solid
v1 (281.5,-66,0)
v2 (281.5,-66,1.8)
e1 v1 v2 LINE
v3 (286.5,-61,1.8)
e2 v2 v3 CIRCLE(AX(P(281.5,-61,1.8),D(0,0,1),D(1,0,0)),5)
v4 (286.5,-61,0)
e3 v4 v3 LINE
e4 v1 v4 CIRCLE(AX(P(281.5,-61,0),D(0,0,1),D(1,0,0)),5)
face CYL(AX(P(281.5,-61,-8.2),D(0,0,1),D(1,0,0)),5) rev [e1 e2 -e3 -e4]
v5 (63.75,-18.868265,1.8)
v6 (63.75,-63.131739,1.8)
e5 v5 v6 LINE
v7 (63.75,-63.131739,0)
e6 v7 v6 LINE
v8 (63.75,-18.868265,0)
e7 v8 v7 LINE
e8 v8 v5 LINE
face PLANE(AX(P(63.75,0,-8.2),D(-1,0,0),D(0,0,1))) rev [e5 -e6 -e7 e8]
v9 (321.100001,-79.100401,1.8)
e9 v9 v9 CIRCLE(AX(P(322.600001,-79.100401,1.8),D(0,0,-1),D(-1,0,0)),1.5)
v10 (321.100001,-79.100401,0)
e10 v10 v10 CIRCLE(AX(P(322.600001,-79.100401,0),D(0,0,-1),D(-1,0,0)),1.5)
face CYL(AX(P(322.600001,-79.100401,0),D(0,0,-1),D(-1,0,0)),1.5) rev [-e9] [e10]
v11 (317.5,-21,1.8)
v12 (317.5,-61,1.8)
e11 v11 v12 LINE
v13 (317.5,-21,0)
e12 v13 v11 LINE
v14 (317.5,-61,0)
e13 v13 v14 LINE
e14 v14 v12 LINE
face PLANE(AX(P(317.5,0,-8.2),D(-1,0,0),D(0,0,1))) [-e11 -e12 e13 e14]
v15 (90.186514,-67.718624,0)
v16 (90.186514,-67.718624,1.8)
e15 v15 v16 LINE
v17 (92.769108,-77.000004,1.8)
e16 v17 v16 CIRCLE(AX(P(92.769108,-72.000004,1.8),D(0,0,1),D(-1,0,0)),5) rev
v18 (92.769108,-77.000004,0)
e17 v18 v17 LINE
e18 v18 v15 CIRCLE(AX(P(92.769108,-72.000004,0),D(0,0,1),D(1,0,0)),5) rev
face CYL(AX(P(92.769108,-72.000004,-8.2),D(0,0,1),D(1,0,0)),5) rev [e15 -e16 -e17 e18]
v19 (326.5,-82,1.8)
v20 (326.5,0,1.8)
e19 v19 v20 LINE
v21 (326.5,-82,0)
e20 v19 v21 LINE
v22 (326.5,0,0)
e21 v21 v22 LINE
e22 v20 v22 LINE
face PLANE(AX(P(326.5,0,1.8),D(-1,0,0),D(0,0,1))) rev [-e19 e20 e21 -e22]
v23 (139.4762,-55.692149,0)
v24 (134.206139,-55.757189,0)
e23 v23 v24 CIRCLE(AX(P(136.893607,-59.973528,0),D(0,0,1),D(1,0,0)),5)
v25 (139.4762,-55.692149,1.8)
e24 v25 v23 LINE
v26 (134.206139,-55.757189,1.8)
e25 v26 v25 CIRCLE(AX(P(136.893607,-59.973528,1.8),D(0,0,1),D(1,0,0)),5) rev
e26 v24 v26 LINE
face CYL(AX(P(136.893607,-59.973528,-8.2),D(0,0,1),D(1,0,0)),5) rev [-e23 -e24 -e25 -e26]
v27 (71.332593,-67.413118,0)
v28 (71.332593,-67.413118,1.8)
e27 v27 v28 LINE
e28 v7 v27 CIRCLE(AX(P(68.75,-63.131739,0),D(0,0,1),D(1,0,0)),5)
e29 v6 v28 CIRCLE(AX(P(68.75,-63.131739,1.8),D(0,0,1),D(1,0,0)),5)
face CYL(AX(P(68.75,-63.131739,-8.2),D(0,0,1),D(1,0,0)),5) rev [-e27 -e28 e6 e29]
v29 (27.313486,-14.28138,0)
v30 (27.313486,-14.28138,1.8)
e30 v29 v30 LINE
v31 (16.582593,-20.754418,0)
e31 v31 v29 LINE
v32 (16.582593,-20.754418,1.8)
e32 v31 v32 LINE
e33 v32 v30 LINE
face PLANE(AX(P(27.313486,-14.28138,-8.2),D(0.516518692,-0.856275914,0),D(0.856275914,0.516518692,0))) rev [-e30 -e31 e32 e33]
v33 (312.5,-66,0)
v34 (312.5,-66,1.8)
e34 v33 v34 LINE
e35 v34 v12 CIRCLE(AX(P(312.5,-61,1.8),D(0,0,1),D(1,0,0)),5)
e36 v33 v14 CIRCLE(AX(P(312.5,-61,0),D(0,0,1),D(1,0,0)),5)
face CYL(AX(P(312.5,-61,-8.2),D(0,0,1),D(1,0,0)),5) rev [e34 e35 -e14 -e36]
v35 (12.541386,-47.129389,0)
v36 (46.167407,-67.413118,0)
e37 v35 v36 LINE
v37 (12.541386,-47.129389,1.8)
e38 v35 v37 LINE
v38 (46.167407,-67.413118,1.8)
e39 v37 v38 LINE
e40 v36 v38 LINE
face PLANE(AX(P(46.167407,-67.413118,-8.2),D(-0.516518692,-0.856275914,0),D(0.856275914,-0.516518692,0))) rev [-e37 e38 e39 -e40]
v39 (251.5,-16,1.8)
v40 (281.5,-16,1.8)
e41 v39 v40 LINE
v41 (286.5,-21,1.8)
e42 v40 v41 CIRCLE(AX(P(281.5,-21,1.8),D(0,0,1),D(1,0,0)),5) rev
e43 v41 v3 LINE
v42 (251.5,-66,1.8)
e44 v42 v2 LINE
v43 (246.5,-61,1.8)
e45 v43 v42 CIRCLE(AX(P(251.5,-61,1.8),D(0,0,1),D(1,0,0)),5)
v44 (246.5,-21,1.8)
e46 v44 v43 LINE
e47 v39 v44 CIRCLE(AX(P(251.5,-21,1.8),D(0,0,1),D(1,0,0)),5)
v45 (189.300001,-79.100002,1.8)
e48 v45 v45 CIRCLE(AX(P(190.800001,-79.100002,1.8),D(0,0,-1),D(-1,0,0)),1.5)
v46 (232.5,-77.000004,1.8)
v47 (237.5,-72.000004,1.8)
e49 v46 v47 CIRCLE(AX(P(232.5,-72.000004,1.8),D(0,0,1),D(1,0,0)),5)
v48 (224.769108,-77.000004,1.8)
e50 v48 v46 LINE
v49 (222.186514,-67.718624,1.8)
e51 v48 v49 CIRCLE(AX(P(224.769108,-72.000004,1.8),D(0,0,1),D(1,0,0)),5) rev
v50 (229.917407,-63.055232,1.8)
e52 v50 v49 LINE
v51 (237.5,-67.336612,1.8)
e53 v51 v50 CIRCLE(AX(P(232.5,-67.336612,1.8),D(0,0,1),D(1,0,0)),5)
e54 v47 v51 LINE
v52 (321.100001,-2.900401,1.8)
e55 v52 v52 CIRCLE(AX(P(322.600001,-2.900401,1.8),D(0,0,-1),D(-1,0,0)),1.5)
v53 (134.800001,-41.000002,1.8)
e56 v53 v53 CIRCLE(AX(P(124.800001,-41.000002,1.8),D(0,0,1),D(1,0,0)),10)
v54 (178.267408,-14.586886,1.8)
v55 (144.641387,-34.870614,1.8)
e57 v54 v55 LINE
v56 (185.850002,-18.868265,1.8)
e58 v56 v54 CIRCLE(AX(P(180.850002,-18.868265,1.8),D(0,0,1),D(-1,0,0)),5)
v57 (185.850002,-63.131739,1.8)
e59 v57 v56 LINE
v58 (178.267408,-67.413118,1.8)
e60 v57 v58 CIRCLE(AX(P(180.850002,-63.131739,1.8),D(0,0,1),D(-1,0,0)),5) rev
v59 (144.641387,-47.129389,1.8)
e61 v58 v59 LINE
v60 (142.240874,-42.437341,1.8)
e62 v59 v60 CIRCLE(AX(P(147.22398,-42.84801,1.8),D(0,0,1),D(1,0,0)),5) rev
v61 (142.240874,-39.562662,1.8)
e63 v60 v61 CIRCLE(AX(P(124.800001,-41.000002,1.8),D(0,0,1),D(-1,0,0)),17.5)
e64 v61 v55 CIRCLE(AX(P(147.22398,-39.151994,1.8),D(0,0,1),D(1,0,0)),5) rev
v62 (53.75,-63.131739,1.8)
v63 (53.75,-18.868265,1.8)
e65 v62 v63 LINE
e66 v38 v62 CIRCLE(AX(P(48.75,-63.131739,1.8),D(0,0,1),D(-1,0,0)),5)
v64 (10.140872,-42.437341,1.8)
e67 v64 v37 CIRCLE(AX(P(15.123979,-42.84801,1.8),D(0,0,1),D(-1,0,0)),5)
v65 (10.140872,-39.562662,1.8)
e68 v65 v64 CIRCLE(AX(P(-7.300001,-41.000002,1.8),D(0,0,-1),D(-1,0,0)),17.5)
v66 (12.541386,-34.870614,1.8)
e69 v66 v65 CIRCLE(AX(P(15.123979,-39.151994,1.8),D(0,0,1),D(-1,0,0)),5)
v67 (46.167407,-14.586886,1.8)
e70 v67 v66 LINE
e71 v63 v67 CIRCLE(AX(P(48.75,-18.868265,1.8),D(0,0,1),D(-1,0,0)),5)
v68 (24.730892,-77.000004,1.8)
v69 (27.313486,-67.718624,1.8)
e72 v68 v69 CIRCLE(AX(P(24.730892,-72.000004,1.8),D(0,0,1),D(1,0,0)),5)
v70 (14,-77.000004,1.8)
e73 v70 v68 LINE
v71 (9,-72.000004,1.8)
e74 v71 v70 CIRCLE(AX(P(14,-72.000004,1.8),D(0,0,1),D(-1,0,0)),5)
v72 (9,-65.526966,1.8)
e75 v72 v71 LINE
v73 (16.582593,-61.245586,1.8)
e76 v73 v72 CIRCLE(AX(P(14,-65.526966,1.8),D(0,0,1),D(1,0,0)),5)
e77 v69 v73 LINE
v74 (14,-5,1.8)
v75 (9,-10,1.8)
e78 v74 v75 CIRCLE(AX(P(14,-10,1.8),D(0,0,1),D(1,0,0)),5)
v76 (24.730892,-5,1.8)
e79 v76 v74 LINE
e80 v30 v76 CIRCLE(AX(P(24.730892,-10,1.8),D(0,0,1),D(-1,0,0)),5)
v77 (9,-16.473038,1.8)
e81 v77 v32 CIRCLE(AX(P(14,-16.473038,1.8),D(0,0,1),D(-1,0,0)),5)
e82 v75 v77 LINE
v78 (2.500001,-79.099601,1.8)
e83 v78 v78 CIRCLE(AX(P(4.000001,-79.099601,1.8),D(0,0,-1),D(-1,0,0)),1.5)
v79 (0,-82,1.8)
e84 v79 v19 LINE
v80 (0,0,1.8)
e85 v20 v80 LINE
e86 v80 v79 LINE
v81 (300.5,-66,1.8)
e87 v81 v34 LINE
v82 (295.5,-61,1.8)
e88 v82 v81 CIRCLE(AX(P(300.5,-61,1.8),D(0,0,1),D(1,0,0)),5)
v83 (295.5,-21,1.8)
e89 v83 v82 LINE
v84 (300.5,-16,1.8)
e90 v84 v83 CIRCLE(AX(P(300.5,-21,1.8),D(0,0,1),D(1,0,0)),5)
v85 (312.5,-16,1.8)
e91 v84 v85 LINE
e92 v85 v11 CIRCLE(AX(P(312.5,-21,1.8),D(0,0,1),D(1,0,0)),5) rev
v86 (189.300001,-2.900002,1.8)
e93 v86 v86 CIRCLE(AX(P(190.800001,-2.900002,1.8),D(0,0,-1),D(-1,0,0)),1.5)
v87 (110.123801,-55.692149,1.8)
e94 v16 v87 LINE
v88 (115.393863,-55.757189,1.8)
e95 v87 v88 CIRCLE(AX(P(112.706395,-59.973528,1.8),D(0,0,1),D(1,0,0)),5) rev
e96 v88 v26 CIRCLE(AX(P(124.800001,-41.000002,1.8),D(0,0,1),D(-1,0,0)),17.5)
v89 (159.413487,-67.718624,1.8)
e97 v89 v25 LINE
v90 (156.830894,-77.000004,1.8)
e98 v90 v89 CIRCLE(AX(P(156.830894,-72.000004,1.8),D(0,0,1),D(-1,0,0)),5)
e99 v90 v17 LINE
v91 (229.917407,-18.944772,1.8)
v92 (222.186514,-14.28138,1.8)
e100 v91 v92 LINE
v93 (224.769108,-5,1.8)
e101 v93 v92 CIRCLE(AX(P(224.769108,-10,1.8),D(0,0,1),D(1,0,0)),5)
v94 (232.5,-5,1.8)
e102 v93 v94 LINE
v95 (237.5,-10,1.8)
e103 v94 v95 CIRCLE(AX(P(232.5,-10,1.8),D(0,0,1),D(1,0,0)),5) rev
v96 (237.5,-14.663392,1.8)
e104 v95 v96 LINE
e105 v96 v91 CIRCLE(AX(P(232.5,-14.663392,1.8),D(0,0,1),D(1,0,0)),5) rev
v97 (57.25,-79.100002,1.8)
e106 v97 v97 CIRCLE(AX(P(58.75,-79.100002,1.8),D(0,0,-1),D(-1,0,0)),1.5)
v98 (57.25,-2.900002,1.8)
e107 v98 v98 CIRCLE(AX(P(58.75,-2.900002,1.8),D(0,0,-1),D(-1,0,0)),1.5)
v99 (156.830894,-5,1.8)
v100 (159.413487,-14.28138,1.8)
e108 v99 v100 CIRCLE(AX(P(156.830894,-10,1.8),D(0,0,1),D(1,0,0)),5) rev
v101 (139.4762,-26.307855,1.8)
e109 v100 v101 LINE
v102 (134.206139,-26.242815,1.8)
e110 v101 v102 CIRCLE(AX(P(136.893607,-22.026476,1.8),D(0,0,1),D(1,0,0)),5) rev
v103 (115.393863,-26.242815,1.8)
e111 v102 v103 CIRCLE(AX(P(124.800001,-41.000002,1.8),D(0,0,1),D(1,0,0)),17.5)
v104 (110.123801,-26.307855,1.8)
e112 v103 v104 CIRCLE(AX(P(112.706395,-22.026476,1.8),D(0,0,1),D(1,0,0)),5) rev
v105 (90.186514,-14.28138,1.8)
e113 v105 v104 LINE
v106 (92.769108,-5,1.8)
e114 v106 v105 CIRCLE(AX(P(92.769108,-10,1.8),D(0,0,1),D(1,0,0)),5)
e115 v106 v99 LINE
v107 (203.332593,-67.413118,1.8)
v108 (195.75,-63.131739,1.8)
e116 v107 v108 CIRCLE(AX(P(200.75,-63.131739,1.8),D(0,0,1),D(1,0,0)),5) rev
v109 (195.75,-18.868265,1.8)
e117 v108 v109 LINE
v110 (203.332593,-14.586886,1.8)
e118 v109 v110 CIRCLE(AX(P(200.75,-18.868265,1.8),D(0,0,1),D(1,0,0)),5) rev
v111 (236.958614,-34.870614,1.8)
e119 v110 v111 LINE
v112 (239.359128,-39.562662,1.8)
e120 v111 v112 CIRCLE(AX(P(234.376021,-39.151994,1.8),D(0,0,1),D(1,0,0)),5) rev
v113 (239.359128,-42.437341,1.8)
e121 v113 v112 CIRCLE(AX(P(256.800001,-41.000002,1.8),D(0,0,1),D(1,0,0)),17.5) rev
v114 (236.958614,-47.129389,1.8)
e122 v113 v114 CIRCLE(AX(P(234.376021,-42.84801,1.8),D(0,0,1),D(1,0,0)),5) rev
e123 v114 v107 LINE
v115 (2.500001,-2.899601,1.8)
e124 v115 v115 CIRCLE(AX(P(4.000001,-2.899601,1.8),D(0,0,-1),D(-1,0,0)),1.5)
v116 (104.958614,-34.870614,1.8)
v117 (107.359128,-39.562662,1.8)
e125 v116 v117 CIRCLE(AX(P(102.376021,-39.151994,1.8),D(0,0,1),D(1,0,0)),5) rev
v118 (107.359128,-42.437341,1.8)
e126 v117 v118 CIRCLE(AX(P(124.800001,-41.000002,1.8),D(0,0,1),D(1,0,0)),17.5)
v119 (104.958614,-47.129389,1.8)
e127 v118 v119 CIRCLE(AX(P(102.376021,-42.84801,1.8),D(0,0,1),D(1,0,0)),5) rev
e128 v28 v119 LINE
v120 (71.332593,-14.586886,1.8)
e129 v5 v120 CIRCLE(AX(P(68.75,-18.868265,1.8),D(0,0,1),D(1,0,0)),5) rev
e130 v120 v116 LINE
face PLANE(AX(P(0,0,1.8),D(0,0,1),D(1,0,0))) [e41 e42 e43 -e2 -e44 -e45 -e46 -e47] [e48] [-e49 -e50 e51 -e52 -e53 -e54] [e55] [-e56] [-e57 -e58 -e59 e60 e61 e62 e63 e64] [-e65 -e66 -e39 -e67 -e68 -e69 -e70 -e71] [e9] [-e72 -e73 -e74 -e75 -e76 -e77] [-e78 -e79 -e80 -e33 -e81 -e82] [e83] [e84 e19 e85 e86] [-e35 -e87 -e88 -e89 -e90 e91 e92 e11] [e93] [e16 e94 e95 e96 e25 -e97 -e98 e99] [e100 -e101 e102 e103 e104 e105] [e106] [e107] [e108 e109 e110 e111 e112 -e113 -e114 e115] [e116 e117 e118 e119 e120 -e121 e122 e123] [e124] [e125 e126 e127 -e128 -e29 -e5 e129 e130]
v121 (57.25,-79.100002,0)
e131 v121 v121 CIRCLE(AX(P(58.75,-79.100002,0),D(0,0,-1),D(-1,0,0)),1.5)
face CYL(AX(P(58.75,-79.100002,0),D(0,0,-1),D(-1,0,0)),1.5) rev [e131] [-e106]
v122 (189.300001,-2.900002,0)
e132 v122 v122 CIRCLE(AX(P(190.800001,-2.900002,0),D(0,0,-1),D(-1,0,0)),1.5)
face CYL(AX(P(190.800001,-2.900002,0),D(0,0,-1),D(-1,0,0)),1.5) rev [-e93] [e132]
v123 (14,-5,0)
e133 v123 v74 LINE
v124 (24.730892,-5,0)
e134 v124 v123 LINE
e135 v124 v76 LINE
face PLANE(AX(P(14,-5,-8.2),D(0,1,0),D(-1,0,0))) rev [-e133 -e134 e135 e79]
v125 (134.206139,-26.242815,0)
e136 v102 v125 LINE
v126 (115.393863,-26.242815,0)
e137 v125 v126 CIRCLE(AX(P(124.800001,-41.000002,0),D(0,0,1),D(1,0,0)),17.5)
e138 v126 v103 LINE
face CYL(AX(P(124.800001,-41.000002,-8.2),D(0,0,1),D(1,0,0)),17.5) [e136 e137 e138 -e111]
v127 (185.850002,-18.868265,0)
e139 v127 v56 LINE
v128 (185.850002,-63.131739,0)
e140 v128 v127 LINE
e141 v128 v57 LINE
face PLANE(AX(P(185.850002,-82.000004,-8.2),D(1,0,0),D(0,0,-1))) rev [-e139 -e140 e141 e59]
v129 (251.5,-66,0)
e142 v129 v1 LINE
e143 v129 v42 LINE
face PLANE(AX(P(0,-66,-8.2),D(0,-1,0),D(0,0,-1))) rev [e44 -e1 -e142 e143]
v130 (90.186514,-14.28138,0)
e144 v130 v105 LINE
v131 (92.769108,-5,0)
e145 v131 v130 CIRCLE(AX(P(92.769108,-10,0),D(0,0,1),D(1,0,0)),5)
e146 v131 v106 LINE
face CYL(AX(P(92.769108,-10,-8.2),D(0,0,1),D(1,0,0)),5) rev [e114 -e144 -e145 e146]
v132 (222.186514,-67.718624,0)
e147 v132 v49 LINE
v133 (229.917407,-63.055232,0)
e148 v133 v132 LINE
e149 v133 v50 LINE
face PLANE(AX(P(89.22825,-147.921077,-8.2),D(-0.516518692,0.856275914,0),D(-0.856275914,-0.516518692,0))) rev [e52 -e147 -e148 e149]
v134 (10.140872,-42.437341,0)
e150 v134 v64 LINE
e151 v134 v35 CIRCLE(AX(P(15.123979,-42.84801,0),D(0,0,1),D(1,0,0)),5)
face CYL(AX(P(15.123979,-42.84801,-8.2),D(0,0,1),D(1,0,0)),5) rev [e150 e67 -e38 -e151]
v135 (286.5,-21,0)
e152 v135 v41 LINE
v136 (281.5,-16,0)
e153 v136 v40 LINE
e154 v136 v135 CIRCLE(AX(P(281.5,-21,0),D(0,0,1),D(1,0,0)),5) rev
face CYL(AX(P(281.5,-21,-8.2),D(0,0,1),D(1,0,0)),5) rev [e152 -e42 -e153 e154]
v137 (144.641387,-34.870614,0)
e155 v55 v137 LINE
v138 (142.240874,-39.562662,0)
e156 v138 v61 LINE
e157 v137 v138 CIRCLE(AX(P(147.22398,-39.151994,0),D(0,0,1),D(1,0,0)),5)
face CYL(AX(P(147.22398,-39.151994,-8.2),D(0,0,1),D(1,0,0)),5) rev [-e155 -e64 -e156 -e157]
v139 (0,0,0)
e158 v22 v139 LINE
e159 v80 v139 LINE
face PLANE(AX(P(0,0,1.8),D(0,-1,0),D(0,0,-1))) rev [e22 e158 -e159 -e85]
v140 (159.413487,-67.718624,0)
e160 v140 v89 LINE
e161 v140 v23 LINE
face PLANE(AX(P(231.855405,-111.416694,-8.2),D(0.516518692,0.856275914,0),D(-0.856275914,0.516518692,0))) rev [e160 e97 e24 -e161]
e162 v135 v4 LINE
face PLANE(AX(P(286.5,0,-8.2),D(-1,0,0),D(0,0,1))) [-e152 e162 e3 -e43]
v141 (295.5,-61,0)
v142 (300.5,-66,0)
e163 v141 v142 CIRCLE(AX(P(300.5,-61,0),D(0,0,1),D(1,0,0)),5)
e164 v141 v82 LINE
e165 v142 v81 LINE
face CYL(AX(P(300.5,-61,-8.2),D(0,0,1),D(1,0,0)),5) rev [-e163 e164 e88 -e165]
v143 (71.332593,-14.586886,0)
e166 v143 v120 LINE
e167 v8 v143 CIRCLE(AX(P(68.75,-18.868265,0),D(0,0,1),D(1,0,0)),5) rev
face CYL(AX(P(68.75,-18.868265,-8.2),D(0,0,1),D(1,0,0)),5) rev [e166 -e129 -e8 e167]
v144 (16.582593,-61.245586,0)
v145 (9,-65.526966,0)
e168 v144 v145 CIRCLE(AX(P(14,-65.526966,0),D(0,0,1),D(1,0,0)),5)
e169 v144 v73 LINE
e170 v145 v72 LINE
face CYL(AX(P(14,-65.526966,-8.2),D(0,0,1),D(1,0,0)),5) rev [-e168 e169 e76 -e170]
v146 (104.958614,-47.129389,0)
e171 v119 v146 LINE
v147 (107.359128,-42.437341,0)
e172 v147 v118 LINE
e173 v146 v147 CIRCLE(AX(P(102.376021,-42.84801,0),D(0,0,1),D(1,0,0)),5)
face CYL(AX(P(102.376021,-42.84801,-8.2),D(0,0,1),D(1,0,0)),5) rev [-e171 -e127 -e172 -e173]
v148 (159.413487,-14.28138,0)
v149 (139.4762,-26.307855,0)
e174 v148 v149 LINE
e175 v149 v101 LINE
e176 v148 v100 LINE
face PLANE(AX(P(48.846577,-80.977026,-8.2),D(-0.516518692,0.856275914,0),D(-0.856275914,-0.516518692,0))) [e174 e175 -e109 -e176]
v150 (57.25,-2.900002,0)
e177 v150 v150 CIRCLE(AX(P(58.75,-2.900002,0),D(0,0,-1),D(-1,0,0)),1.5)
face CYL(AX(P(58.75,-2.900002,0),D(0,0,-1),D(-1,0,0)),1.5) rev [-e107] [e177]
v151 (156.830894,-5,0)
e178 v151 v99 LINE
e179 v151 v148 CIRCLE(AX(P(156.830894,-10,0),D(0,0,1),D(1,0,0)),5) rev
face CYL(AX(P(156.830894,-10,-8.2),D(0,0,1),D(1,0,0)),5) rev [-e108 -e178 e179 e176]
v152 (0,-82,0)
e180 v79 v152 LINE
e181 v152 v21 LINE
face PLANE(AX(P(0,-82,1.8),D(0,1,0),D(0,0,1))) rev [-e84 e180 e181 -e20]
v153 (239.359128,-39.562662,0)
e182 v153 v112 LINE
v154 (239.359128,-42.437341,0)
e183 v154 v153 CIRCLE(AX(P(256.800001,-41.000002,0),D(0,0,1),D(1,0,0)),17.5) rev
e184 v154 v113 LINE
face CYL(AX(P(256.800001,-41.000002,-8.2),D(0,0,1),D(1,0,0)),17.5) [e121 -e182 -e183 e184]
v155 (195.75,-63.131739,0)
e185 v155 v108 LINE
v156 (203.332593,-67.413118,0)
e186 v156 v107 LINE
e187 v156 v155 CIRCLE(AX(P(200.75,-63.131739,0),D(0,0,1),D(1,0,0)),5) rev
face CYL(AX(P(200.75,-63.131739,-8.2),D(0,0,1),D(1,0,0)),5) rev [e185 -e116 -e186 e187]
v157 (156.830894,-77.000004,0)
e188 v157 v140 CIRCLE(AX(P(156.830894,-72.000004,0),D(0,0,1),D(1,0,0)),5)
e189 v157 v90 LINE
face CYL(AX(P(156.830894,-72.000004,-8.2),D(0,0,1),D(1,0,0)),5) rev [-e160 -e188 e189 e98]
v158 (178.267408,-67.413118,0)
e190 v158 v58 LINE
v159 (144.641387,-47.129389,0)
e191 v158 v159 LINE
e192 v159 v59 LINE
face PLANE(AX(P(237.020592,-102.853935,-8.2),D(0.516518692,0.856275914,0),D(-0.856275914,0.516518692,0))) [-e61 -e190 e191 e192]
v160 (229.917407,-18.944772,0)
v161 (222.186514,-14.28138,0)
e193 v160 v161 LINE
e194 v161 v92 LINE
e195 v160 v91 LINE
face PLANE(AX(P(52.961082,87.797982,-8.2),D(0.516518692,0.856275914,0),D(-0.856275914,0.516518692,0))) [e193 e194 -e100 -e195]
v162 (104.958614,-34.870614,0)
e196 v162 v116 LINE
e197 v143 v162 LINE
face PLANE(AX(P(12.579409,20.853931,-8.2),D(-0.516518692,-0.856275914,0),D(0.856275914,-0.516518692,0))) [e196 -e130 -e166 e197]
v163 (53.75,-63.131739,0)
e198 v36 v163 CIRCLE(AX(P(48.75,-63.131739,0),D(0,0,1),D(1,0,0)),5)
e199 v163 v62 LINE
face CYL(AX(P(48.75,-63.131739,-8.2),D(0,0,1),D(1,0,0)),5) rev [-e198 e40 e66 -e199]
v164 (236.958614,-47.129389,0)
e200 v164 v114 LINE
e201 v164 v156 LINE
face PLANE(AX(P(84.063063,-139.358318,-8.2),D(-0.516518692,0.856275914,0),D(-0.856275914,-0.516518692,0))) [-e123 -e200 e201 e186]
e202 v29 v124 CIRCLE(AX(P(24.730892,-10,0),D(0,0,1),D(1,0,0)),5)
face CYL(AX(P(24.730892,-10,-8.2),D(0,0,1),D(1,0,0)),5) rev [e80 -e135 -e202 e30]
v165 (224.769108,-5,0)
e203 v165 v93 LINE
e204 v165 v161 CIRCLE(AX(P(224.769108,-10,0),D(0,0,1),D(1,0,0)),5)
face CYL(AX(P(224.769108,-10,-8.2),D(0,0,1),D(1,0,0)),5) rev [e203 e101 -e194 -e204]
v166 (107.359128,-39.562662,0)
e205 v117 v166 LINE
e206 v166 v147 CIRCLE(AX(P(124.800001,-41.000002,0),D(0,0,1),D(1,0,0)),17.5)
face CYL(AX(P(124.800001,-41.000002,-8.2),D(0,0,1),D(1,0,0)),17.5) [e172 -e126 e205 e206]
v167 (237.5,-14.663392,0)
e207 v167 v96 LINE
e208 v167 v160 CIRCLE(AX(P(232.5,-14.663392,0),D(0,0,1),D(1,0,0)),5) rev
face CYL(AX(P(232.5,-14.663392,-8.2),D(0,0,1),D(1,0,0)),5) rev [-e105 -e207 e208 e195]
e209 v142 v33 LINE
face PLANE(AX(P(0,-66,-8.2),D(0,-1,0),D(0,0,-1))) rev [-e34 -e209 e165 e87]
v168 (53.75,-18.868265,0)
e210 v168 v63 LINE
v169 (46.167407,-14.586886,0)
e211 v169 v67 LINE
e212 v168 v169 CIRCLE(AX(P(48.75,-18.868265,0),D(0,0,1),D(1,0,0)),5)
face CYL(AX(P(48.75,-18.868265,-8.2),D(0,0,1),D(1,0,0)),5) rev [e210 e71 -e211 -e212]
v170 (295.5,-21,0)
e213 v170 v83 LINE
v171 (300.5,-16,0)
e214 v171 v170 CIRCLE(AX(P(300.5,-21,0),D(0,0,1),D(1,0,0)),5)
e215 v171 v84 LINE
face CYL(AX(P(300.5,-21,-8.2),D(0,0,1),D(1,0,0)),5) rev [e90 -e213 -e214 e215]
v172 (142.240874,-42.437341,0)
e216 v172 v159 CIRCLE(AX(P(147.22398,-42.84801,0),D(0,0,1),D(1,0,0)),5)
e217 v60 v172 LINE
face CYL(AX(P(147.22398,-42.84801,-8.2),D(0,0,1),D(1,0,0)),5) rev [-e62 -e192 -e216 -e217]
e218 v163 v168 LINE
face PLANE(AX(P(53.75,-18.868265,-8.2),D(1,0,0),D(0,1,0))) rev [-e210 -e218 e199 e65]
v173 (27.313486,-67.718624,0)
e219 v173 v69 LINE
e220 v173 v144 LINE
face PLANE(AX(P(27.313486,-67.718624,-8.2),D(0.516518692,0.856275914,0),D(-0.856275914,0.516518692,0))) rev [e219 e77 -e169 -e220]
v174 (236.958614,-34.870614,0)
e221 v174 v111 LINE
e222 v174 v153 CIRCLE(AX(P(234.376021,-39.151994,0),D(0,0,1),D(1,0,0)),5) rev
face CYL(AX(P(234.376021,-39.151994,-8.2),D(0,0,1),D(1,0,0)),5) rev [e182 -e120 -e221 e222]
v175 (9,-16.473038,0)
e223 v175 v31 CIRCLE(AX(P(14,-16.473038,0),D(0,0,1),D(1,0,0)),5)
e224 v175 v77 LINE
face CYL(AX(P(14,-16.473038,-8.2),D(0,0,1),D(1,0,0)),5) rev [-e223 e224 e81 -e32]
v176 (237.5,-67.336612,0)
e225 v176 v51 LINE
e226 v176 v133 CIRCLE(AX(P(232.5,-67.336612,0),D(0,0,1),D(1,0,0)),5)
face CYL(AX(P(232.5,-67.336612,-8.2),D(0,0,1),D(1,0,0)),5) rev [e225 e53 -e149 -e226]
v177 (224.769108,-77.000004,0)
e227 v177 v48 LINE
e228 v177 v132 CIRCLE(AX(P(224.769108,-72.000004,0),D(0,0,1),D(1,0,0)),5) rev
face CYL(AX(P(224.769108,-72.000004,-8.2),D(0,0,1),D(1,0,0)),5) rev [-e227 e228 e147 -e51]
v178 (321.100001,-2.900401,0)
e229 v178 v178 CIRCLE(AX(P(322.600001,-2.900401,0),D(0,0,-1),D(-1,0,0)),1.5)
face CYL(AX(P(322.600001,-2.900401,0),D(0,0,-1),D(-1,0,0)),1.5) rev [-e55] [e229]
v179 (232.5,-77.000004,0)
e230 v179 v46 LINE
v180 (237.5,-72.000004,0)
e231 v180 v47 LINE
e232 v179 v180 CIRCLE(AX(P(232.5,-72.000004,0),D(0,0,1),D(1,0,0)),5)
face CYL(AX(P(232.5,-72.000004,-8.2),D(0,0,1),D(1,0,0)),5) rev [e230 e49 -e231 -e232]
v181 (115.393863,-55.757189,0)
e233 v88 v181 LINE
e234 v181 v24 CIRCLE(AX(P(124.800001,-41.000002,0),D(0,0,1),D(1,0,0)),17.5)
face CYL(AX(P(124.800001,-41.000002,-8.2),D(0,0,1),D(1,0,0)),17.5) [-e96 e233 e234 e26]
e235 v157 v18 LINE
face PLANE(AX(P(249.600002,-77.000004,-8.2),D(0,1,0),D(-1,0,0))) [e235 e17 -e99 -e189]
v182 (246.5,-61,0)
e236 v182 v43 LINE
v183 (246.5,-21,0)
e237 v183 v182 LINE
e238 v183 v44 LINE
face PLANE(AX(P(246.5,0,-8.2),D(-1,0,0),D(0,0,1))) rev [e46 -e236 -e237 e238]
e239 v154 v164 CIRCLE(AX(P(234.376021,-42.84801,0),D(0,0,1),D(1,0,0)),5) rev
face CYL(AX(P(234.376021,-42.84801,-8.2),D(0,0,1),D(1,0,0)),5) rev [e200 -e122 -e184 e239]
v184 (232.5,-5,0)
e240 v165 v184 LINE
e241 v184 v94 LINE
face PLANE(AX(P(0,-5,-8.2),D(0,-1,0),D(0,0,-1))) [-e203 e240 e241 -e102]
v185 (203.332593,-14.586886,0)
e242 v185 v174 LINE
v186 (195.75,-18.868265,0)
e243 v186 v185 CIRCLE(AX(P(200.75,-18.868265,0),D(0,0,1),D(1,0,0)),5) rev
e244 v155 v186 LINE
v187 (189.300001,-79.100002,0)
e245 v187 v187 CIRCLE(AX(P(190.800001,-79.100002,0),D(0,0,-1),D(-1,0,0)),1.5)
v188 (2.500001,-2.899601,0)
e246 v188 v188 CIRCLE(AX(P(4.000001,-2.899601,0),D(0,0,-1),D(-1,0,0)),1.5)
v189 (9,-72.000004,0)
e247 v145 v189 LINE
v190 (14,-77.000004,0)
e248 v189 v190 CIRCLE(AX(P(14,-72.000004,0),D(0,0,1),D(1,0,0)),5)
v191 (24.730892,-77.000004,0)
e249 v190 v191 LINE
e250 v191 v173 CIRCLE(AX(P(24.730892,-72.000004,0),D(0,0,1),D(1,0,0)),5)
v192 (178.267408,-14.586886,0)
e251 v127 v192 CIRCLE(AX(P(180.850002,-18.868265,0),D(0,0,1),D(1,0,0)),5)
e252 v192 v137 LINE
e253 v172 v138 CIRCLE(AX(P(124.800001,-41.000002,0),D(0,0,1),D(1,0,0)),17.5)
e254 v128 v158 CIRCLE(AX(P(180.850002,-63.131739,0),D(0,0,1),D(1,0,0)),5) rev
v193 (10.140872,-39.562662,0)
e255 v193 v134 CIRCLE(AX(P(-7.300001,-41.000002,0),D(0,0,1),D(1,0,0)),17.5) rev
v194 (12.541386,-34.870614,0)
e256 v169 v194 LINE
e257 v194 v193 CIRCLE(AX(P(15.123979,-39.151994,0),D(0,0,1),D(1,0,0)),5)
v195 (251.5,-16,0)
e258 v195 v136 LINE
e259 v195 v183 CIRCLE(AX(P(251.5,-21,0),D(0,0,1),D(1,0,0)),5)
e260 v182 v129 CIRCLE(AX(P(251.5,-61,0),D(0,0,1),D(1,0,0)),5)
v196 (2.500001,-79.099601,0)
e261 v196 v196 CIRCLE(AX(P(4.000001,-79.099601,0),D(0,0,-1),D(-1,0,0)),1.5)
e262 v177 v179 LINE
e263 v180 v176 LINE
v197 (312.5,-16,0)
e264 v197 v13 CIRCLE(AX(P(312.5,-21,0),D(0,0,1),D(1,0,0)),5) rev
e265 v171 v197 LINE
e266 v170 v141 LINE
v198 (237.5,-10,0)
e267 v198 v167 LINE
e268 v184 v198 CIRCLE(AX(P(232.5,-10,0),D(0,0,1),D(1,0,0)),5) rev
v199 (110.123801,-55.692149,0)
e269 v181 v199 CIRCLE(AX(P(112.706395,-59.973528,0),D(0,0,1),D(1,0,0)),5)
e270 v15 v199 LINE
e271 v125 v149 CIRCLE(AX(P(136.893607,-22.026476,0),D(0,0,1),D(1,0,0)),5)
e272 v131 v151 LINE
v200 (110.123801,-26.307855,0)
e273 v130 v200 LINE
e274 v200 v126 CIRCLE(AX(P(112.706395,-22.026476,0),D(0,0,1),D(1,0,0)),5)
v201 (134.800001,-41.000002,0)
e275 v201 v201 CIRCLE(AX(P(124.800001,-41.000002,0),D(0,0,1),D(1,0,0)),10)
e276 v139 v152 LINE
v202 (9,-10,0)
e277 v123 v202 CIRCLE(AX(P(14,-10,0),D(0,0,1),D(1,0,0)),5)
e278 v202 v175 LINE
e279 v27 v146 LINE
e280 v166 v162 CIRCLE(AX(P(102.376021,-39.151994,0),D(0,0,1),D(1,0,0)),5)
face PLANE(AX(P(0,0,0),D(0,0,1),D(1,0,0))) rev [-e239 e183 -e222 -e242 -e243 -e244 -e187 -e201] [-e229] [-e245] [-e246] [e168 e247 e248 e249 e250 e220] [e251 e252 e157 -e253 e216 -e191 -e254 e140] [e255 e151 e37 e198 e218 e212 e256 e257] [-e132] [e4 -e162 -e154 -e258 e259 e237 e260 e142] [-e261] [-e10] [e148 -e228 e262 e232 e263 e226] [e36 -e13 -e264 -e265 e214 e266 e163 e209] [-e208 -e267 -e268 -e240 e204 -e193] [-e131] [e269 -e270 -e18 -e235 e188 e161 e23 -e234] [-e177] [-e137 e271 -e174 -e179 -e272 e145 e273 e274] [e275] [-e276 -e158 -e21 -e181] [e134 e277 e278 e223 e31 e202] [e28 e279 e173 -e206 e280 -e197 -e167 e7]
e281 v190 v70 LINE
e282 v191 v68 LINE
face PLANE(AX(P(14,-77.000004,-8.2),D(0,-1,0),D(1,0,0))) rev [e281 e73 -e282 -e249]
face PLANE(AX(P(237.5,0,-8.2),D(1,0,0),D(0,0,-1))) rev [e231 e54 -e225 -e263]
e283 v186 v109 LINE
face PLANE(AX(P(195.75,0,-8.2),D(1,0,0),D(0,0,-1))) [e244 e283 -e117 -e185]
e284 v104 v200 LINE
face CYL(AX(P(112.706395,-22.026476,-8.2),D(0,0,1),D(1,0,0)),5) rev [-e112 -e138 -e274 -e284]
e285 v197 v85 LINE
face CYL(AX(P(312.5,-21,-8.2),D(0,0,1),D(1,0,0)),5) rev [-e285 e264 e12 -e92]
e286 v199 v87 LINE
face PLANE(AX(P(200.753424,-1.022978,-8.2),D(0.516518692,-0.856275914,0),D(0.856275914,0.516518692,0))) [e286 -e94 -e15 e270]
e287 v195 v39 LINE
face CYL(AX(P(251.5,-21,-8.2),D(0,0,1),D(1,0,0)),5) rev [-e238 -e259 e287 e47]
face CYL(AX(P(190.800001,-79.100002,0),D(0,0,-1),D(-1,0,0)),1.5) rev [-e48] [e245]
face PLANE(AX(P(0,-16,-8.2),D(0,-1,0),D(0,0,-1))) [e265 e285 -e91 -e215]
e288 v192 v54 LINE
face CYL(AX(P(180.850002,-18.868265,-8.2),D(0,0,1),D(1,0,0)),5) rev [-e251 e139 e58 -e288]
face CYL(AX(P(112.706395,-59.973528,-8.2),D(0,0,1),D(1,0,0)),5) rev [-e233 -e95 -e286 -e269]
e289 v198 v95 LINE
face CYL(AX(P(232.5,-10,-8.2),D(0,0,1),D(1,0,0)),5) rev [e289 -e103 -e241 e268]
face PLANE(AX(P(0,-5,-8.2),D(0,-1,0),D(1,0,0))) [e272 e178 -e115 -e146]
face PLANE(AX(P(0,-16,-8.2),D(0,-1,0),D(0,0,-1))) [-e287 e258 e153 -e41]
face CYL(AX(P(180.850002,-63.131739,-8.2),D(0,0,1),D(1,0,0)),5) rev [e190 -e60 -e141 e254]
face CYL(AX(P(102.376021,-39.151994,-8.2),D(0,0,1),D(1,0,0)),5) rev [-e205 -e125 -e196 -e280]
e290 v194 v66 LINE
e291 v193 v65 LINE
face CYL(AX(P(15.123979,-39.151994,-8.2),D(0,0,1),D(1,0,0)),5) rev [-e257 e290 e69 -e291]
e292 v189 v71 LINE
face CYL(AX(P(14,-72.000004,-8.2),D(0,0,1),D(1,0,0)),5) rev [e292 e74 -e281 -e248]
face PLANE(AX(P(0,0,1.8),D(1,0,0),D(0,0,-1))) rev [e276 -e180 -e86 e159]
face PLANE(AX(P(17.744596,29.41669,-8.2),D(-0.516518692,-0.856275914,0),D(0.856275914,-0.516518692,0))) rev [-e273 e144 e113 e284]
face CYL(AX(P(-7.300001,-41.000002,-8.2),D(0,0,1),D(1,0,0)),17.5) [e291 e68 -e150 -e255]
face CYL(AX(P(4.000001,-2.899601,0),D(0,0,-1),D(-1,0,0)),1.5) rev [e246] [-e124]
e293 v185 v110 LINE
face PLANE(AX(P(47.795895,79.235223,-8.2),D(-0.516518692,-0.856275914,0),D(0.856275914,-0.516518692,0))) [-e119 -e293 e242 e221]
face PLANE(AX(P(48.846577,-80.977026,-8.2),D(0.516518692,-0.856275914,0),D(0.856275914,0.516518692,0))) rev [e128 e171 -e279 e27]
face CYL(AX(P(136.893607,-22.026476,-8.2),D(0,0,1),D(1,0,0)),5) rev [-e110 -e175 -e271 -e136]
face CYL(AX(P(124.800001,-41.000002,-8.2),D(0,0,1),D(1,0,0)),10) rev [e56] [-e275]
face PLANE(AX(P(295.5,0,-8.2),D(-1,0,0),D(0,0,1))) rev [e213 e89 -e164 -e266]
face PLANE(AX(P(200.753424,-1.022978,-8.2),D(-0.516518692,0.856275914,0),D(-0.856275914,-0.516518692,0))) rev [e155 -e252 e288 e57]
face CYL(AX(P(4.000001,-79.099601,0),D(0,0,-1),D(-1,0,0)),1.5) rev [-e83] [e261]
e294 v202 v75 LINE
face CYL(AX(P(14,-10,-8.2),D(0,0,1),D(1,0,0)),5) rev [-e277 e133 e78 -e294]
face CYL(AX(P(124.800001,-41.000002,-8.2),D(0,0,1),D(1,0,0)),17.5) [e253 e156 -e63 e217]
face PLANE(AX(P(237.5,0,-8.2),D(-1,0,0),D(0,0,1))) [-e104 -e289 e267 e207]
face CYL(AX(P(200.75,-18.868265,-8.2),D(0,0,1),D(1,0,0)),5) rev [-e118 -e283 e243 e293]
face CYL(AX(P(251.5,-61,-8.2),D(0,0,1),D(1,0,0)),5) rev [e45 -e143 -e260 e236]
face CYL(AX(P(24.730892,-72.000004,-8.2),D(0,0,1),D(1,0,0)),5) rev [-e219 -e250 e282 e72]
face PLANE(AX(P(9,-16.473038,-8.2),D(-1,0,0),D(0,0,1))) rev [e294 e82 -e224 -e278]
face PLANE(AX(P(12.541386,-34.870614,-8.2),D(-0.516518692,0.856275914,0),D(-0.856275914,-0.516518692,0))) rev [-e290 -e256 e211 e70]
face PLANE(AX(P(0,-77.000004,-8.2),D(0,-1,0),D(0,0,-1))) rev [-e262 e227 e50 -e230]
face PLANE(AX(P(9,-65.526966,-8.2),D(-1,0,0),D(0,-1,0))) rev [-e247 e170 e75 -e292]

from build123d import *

# Parameters (mm, degrees)
SKETCH1_W                = 326.5
SKETCH1_H                = 82
BOSS_EXTRUDE1_DEPTH      = 1.8
SKETCH2_R                = 10
CUT_EXTRUDE1_DEPTH       = 337.644456363
FILLET1_R                = 5
F_3_0MM_DOWEL_HOLE1_D    = 3
SKETCH9_W                = 262.606620854
SKETCH9_H                = 72
BOSS_EXTRUDE2_DEPTH      = 1.8
SKETCH11_R               = 10
CUT_EXTRUDE2_DEPTH       = 10
FILLET3_R                = 5
CIRPATTERN1_COUNT        = 2
FILLET3_OF_CIRPATTERN1_R = 5
MIRROR2_OUTLINE_R        = 10
MIRROR2_DEPTH            = 1.8
CUT_EXTRUDE3_DEPTH       = 10
SKETCH15_W               = 122.10000152
SKETCH15_H               = 72.000003966
BOSS_EXTRUDE3_DEPTH      = 1.8
CUT_EXTRUDE5_DEPTH       = 10


# Read off the part's stored shape, not the designer's step: Mirror2
with BuildPart() as part:
    # Sketch1 → Boss-Extrude1 (new body)
    with BuildSketch(Plane.XY):
        with Locations((163.25, -41)):
            Rectangle(SKETCH1_W, SKETCH1_H)
    extrude(amount=BOSS_EXTRUDE1_DEPTH)

    # Sketch2 → Cut-Extrude1 (cut, through all)
    with BuildSketch(Plane.XY.offset(1.8)):
        with BuildLine():
            Line((261.75, -58.549288202), (261.75, -23.450711798))
            ThreePointArc((261.75, -23.450711798), (258.412824832, -18.735310057), (252.855994568, -20.314356955))
            Line((252.855994568, -20.314356955), (244.188659756, -31.075463568))
            ThreePointArc((244.188659756, -31.075463568), (247.220227729, -42.383489334), (242.444203365, -53.072335968))
            Line((242.444203365, -53.072335968), (253.536061952, -62.379510418))
            ThreePointArc((253.536061952, -62.379510418), (258.863091309, -63.080827137), (261.75, -58.549288202))
        make_face()
        with BuildLine():
            ThreePointArc((223.149351867, -24.802753883), (229.77500038, -23.5), (236.400648893, -24.802753883))
            Line((236.400648893, -24.802753883), (245.797134791, -13.136354843))
            ThreePointArc((245.797134791, -13.136354843), (246.413216621, -7.841502167), (241.90312936, -5))
            Line((241.90312936, -5), (217.6468714, -5))
            ThreePointArc((217.6468714, -5), (213.136784139, -7.841502167), (213.752865969, -13.136354843))
            Line((213.752865969, -13.136354843), (223.149351867, -24.802753883))
        make_face()
        with BuildLine():
            Line((245.797134791, -68.863645157), (236.400648893, -57.197246117))
            ThreePointArc((236.400648893, -57.197246117), (229.77500038, -58.5), (223.149351867, -57.197246117))
            Line((223.149351867, -57.197246117), (213.752865969, -68.863645157))
            ThreePointArc((213.752865969, -68.863645157), (213.136784139, -74.158497833), (217.6468714, -77))
            Line((217.6468714, -77), (241.90312936, -77))
            ThreePointArc((241.90312936, -77), (246.413216621, -74.158497833), (245.797134791, -68.863645157))
        make_face()
        with BuildLine():
            ThreePointArc((217.105797395, -53.072335968), (212.329773031, -42.383489334), (215.361341004, -31.075463568))
            Line((215.361341004, -31.075463568), (206.694006192, -20.314356955))
            ThreePointArc((206.694006192, -20.314356955), (201.137175928, -18.735310057), (197.80000076, -23.450711798))
            Line((197.80000076, -23.450711798), (197.80000076, -58.549288202))
            ThreePointArc((197.80000076, -58.549288202), (200.686909451, -63.080827137), (206.013938808, -62.379510418))
            Line((206.013938808, -62.379510418), (217.105797395, -53.072335968))
        make_face()
        with BuildLine():
            Line((313, -5), (290.410254038, -5))
            ThreePointArc((290.410254038, -5), (285.580624906, -8.705904774), (287.910254038, -14.330127019))
            Line((287.910254038, -14.330127019), (310.5, -27.372322931))
            ThreePointArc((310.5, -27.372322931), (315.5, -27.372322931), (318, -23.042195912))
            Line((318, -23.042195912), (318, -10))
            ThreePointArc((318, -10), (316.535533906, -6.464466094), (313, -5))
        make_face()
        with BuildLine():
            Line((279.25, -61.122867597), (314.103829072, -41))
            Line((314.103829072, -41), (279.25, -20.877132403))
            ThreePointArc((279.25, -20.877132403), (274.25, -20.877132403), (271.75, -25.207259422))
            Line((271.75, -25.207259422), (271.75, -56.792740578))
            ThreePointArc((271.75, -56.792740578), (274.25, -61.122867597), (279.25, -61.122867597))
        make_face()
        with BuildLine():
            Line((310.5, -54.627677069), (287.910254038, -67.669872981))
            ThreePointArc((287.910254038, -67.669872981), (285.580624906, -73.294095226), (290.410254038, -77))
            Line((290.410254038, -77), (313, -77))
            ThreePointArc((313, -77), (316.535533906, -75.535533906), (318, -72))
            Line((318, -72), (318, -58.957804088))
            ThreePointArc((318, -58.957804088), (315.5, -54.627677069), (310.5, -54.627677069))
        make_face()
        with Locations((229.77500038, -41)):
            Circle(SKETCH2_R)
    extrude(amount=-CUT_EXTRUDE1_DEPTH, mode=Mode.SUBTRACT)

    # Fillet1
    fillet1_edges = [part.edges().sort_by_distance(p)[0] for p in [
        (242.444203365, -53.072335968, 0.9),
        (244.188659756, -31.075463568, 0.9),
        (223.149351867, -57.197246117, 0.9),
        (236.400648893, -57.197246117, 0.9),
        (215.361341004, -31.075463568, 0.9),
        (217.105797395, -53.072335968, 0.9),
        (236.400648893, -24.802753883, 0.9),
        (223.149351867, -24.802753883, 0.9),
    ]]
    fillet(fillet1_edges, radius=FILLET1_R)

    # Ø3.0mm Dowel Hole1 (through all)
    with Locations(Plane(origin=(190.80000076, -2.900001983, 0), x_dir=(-1, 0, 0), z_dir=(0, 0, -1))):
        with Locations((0, 0), (0, -76.2), (132.05000076, 0), (132.05000076, -76.2), (186.79999978, -76.19959868), (186.79999978, 0.00040132), (-131.80000056, -0.00039878), (-131.80000056, -76.20039878)):
            Hole(F_3_0MM_DOWEL_HOLE1_D / 2)

    # Sketch9 → Boss-Extrude2 (add)
    with BuildSketch(Plane.XY.offset(1.8)):
        with Locations((195.196689573, -41)):
            Rectangle(SKETCH9_W, SKETCH9_H)
    extrude(amount=-BOSS_EXTRUDE2_DEPTH)

    # Sketch11 → Cut-Extrude2 (cut)
    with BuildSketch(Plane.XY.offset(1.8)):
        with BuildLine():
            Line((156.830893904, -5), (92.769107616, -5))
            ThreePointArc((92.769107616, -5), (87.952111776, -8.659645168), (90.186514156, -14.28137957))
            Line((90.186514156, -14.28137957), (113.022410587, -28.056340611))
            ThreePointArc((113.022410587, -28.056340611), (124.80000076, -23.500001983), (136.577590933, -28.056340611))
            Line((136.577590933, -28.056340611), (159.413487364, -14.28137957))
            ThreePointArc((159.413487364, -14.28137957), (161.647889744, -8.659645168), (156.830893904, -5))
        make_face()
        with BuildLine():
            ThreePointArc((107.857223667, -45.380904215), (107.30000076, -41.000001983), (107.857223667, -36.61909975))
            Line((107.857223667, -36.61909975), (71.33259346, -14.586885702))
            ThreePointArc((71.33259346, -14.586885702), (66.291643567, -14.514360858), (63.75, -18.868265272))
            Line((63.75, -18.868265272), (63.75, -63.131738694))
            ThreePointArc((63.75, -63.131738694), (66.291643567, -67.485643108), (71.33259346, -67.413118263))
            Line((71.33259346, -67.413118263), (107.857223667, -45.380904215))
        make_face()
        with Locations((124.80000076, -41.000001983)):
            Circle(SKETCH11_R)
    cut_extrude2 = extrude(amount=-CUT_EXTRUDE2_DEPTH, mode=Mode.SUBTRACT)

    # Fillet3
    fillet3_edges = [part.edges().sort_by_distance(p)[0] for p in [
        (107.857223667, -36.61909975, 0.9),
        (107.857223667, -45.380904215, 0.9),
        (136.577590933, -28.056340611, 0.9),
        (113.022410587, -28.056340611, 0.9),
    ]]
    fillet(fillet3_edges, radius=FILLET3_R)

    # CirPattern1: Cut-Extrude2 ×2 about axis
    cirpattern1_axis = Axis((124.80000076, -41.000001983, 0), (0, 0, 1))
    for i in range(1, CIRPATTERN1_COUNT):
        add(cut_extrude2.rotate(cirpattern1_axis, i * 360 / CIRPATTERN1_COUNT), mode=Mode.SUBTRACT)

    # Fillet3 of CirPattern1
    fillet3_of_cirpattern1_edges = [part.edges().sort_by_distance(p)[0] for p in [
        (141.742777853, -45.380904215, 0.9),
        (141.742777853, -36.61909975, 0.9),
        (113.022410587, -53.943663355, 0.9),
        (136.577590933, -53.943663355, 0.9),
    ]]
    fillet(fillet3_of_cirpattern1_edges, radius=FILLET3_OF_CIRPATTERN1_R)

    # Mirror2 outline → Mirror2 (cut)
    with BuildSketch(Plane.XY):
        with BuildLine():
            ThreePointArc((291.413487364, -14.28137957), (293.647889744, -8.659645168), (288.830893904, -5))
            Line((288.830893904, -5), (224.769107616, -5))
            ThreePointArc((224.769107616, -5), (219.952111776, -8.659645168), (222.186514156, -14.28137957))
            Line((222.186514156, -14.28137957), (242.123801415, -26.307855346))
            ThreePointArc((242.123801415, -26.307855346), (244.768097628, -27.026095039), (247.39386285, -26.242814934))
            ThreePointArc((247.39386285, -26.242814934), (256.80000076, -23.500001983), (266.20613867, -26.242814934))
            ThreePointArc((266.20613867, -26.242814934), (268.831903892, -27.026095039), (271.476200105, -26.307855346))
            Line((271.476200105, -26.307855346), (291.413487364, -14.28137957))
        make_face()
        with BuildLine():
            ThreePointArc((222.186514156, -67.718624396), (219.952111776, -73.340358798), (224.769107616, -77.000003966))
            Line((224.769107616, -77.000003966), (288.830893904, -77.000003966))
            ThreePointArc((288.830893904, -77.000003966), (293.647889744, -73.340358798), (291.413487364, -67.718624396))
            Line((291.413487364, -67.718624396), (271.476200105, -55.69214862))
            ThreePointArc((271.476200105, -55.69214862), (268.831903892, -54.973908927), (266.20613867, -55.757189032))
            ThreePointArc((266.20613867, -55.757189032), (256.80000076, -58.500001983), (247.39386285, -55.757189032))
            ThreePointArc((247.39386285, -55.757189032), (244.768097628, -54.973908927), (242.123801415, -55.69214862))
            Line((242.123801415, -55.69214862), (222.186514156, -67.718624396))
        make_face()
        with BuildLine():
            ThreePointArc((195.75, -63.131738694), (198.291643567, -67.485643108), (203.33259346, -67.413118263))
            Line((203.33259346, -67.413118263), (236.958614495, -47.12938948))
            ThreePointArc((236.958614495, -47.12938948), (238.827288605, -45.125336638), (239.359127641, -42.437341482))
            ThreePointArc((239.359127641, -42.437341482), (239.30000076, -41.000001983), (239.359127641, -39.562662484))
            ThreePointArc((239.359127641, -39.562662484), (238.827288605, -36.874667328), (236.958614495, -34.870614486))
            Line((236.958614495, -34.870614486), (203.33259346, -14.586885702))
            ThreePointArc((203.33259346, -14.586885702), (198.291643567, -14.514360858), (195.75, -18.868265272))
            Line((195.75, -18.868265272), (195.75, -63.131738694))
        make_face()
        with BuildLine():
            ThreePointArc((274.240873879, -39.562662484), (274.30000076, -41.000001983), (274.240873879, -42.437341482))
            ThreePointArc((274.240873879, -42.437341482), (274.772712915, -45.125336638), (276.641387025, -47.12938948))
            Line((276.641387025, -47.12938948), (310.26740806, -67.413118263))
            ThreePointArc((310.26740806, -67.413118263), (315.308357953, -67.485643108), (317.85000152, -63.131738694))
            Line((317.85000152, -63.131738694), (317.85000152, -18.868265272))
            ThreePointArc((317.85000152, -18.868265272), (315.308357953, -14.514360858), (310.26740806, -14.586885702))
            Line((310.26740806, -14.586885702), (276.641387025, -34.870614486))
            ThreePointArc((276.641387025, -34.870614486), (274.772712915, -36.874667328), (274.240873879, -39.562662484))
        make_face()
        with Locations((256.80000076, -41.000001983)):
            Circle(MIRROR2_OUTLINE_R)
    extrude(amount=MIRROR2_DEPTH, mode=Mode.SUBTRACT)

    # Sketch13 → Cut-Extrude3 (cut)
    with BuildSketch(Plane.XY.offset(1.8)):
        with BuildLine():
            Line((14, -5), (24.730892384, -5))
            ThreePointArc((24.730892384, -5), (29.547888224, -8.659645168), (27.313485844, -14.28137957))
            Line((27.313485844, -14.28137957), (16.58259346, -20.754417533))
            ThreePointArc((16.58259346, -20.754417533), (11.541643567, -20.826942378), (9, -16.473037963))
            Line((9, -16.473037963), (9, -10))
            ThreePointArc((9, -10), (10.464466094, -6.464466094), (14, -5))
        make_face()
        with BuildLine():
            Line((46.16740654, -67.413118263), (12.541385505, -47.12938948))
            ThreePointArc((12.541385505, -47.12938948), (10.672711395, -45.125336638), (10.140872359, -42.437341482))
            ThreePointArc((10.140872359, -42.437341482), (10.19999924, -41.000001983), (10.140872359, -39.562662484))
            ThreePointArc((10.140872359, -39.562662484), (10.672711395, -36.874667328), (12.541385505, -34.870614486))
            Line((12.541385505, -34.870614486), (46.16740654, -14.586885702))
            ThreePointArc((46.16740654, -14.586885702), (51.208356433, -14.514360858), (53.75, -18.868265272))
            Line((53.75, -18.868265272), (53.75, -63.131738694))
            ThreePointArc((53.75, -63.131738694), (51.208356433, -67.485643108), (46.16740654, -67.413118263))
        make_face()
        with BuildLine():
            Line((27.313485844, -67.718624396), (16.58259346, -61.245586433))
            ThreePointArc((16.58259346, -61.245586433), (11.541643567, -61.173061588), (9, -65.526966002))
            Line((9, -65.526966002), (9, -72.000003966))
            ThreePointArc((9, -72.000003966), (10.464466094, -75.535537872), (14, -77.000003966))
            Line((14, -77.000003966), (24.730892384, -77.000003966))
            ThreePointArc((24.730892384, -77.000003966), (29.547888224, -73.340358798), (27.313485844, -67.718624396))
        make_face()
    extrude(amount=-CUT_EXTRUDE3_DEPTH, mode=Mode.SUBTRACT)

    # Sketch15 → Boss-Extrude3 (add)
    with BuildSketch(Plane.XY.offset(1.8)):
        with Locations((256.80000076, -41.000001983)):
            Rectangle(SKETCH15_W, SKETCH15_H)
    extrude(amount=-BOSS_EXTRUDE3_DEPTH)

    # Sketch14 → Cut-Extrude5 (cut)
    with BuildSketch(Plane.XY.offset(1.8)):
        with BuildLine():
            Line((281.5, -16), (251.5, -16))
            ThreePointArc((251.5, -16), (247.964466094, -17.464466094), (246.5, -21))
            Line((246.5, -21), (246.5, -61))
            ThreePointArc((246.5, -61), (247.964466094, -64.535533906), (251.5, -66))
            Line((251.5, -66), (281.5, -66))
            ThreePointArc((281.5, -66), (285.035533906, -64.535533906), (286.5, -61))
            Line((286.5, -61), (286.5, -21))
            ThreePointArc((286.5, -21), (285.035533906, -17.464466094), (281.5, -16))
        make_face()
        with BuildLine():
            Line((203.33259346, -67.413118263), (236.958614495, -47.12938948))
            ThreePointArc((236.958614495, -47.12938948), (238.827288605, -45.125336638), (239.359127641, -42.437341482))
            ThreePointArc((239.359127641, -42.437341482), (239.30000076, -41.000001983), (239.359127641, -39.562662484))
            ThreePointArc((239.359127641, -39.562662484), (238.827288605, -36.874667328), (236.958614495, -34.870614486))
            Line((236.958614495, -34.870614486), (203.33259346, -14.586885702))
            ThreePointArc((203.33259346, -14.586885702), (198.291643567, -14.514360858), (195.75, -18.868265272))
            Line((195.75, -18.868265272), (195.75, -63.131738694))
            ThreePointArc((195.75, -63.131738694), (198.291643567, -67.485643108), (203.33259346, -67.413118263))
        make_face()
        with BuildLine():
            Line((232.5, -5), (224.769107616, -5))
            ThreePointArc((224.769107616, -5), (219.952111776, -8.659645168), (222.186514156, -14.28137957))
            Line((222.186514156, -14.28137957), (229.91740654, -18.944771774))
            ThreePointArc((229.91740654, -18.944771774), (234.958356433, -19.017296619), (237.5, -14.663392205))
            Line((237.5, -14.663392205), (237.5, -10))
            ThreePointArc((237.5, -10), (236.035533906, -6.464466094), (232.5, -5))
        make_face()
        with BuildLine():
            ThreePointArc((232.5, -77.000003966), (236.035533906, -75.535537872), (237.5, -72.000003966))
            Line((237.5, -72.000003966), (237.5, -67.336611761))
            ThreePointArc((237.5, -67.336611761), (234.958356433, -62.982707347), (229.91740654, -63.055232191))
            Line((229.91740654, -63.055232191), (222.186514156, -67.718624396))
            ThreePointArc((222.186514156, -67.718624396), (219.952111776, -73.340358798), (224.769107616, -77.000003966))
            Line((224.769107616, -77.000003966), (232.5, -77.000003966))
        make_face()
        with BuildLine():
            Line((312.5, -16), (300.5, -16))
            ThreePointArc((300.5, -16), (296.964466094, -17.464466094), (295.5, -21))
            Line((295.5, -21), (295.5, -61))
            ThreePointArc((295.5, -61), (296.964466094, -64.535533906), (300.5, -66))
            Line((300.5, -66), (312.5, -66))
            ThreePointArc((312.5, -66), (316.035533906, -64.535533906), (317.5, -61))
            Line((317.5, -61), (317.5, -21))
            ThreePointArc((317.5, -21), (316.035533906, -17.464466094), (312.5, -16))
        make_face()
    extrude(amount=-CUT_EXTRUDE5_DEPTH, mode=Mode.SUBTRACT)


solid = part.part
